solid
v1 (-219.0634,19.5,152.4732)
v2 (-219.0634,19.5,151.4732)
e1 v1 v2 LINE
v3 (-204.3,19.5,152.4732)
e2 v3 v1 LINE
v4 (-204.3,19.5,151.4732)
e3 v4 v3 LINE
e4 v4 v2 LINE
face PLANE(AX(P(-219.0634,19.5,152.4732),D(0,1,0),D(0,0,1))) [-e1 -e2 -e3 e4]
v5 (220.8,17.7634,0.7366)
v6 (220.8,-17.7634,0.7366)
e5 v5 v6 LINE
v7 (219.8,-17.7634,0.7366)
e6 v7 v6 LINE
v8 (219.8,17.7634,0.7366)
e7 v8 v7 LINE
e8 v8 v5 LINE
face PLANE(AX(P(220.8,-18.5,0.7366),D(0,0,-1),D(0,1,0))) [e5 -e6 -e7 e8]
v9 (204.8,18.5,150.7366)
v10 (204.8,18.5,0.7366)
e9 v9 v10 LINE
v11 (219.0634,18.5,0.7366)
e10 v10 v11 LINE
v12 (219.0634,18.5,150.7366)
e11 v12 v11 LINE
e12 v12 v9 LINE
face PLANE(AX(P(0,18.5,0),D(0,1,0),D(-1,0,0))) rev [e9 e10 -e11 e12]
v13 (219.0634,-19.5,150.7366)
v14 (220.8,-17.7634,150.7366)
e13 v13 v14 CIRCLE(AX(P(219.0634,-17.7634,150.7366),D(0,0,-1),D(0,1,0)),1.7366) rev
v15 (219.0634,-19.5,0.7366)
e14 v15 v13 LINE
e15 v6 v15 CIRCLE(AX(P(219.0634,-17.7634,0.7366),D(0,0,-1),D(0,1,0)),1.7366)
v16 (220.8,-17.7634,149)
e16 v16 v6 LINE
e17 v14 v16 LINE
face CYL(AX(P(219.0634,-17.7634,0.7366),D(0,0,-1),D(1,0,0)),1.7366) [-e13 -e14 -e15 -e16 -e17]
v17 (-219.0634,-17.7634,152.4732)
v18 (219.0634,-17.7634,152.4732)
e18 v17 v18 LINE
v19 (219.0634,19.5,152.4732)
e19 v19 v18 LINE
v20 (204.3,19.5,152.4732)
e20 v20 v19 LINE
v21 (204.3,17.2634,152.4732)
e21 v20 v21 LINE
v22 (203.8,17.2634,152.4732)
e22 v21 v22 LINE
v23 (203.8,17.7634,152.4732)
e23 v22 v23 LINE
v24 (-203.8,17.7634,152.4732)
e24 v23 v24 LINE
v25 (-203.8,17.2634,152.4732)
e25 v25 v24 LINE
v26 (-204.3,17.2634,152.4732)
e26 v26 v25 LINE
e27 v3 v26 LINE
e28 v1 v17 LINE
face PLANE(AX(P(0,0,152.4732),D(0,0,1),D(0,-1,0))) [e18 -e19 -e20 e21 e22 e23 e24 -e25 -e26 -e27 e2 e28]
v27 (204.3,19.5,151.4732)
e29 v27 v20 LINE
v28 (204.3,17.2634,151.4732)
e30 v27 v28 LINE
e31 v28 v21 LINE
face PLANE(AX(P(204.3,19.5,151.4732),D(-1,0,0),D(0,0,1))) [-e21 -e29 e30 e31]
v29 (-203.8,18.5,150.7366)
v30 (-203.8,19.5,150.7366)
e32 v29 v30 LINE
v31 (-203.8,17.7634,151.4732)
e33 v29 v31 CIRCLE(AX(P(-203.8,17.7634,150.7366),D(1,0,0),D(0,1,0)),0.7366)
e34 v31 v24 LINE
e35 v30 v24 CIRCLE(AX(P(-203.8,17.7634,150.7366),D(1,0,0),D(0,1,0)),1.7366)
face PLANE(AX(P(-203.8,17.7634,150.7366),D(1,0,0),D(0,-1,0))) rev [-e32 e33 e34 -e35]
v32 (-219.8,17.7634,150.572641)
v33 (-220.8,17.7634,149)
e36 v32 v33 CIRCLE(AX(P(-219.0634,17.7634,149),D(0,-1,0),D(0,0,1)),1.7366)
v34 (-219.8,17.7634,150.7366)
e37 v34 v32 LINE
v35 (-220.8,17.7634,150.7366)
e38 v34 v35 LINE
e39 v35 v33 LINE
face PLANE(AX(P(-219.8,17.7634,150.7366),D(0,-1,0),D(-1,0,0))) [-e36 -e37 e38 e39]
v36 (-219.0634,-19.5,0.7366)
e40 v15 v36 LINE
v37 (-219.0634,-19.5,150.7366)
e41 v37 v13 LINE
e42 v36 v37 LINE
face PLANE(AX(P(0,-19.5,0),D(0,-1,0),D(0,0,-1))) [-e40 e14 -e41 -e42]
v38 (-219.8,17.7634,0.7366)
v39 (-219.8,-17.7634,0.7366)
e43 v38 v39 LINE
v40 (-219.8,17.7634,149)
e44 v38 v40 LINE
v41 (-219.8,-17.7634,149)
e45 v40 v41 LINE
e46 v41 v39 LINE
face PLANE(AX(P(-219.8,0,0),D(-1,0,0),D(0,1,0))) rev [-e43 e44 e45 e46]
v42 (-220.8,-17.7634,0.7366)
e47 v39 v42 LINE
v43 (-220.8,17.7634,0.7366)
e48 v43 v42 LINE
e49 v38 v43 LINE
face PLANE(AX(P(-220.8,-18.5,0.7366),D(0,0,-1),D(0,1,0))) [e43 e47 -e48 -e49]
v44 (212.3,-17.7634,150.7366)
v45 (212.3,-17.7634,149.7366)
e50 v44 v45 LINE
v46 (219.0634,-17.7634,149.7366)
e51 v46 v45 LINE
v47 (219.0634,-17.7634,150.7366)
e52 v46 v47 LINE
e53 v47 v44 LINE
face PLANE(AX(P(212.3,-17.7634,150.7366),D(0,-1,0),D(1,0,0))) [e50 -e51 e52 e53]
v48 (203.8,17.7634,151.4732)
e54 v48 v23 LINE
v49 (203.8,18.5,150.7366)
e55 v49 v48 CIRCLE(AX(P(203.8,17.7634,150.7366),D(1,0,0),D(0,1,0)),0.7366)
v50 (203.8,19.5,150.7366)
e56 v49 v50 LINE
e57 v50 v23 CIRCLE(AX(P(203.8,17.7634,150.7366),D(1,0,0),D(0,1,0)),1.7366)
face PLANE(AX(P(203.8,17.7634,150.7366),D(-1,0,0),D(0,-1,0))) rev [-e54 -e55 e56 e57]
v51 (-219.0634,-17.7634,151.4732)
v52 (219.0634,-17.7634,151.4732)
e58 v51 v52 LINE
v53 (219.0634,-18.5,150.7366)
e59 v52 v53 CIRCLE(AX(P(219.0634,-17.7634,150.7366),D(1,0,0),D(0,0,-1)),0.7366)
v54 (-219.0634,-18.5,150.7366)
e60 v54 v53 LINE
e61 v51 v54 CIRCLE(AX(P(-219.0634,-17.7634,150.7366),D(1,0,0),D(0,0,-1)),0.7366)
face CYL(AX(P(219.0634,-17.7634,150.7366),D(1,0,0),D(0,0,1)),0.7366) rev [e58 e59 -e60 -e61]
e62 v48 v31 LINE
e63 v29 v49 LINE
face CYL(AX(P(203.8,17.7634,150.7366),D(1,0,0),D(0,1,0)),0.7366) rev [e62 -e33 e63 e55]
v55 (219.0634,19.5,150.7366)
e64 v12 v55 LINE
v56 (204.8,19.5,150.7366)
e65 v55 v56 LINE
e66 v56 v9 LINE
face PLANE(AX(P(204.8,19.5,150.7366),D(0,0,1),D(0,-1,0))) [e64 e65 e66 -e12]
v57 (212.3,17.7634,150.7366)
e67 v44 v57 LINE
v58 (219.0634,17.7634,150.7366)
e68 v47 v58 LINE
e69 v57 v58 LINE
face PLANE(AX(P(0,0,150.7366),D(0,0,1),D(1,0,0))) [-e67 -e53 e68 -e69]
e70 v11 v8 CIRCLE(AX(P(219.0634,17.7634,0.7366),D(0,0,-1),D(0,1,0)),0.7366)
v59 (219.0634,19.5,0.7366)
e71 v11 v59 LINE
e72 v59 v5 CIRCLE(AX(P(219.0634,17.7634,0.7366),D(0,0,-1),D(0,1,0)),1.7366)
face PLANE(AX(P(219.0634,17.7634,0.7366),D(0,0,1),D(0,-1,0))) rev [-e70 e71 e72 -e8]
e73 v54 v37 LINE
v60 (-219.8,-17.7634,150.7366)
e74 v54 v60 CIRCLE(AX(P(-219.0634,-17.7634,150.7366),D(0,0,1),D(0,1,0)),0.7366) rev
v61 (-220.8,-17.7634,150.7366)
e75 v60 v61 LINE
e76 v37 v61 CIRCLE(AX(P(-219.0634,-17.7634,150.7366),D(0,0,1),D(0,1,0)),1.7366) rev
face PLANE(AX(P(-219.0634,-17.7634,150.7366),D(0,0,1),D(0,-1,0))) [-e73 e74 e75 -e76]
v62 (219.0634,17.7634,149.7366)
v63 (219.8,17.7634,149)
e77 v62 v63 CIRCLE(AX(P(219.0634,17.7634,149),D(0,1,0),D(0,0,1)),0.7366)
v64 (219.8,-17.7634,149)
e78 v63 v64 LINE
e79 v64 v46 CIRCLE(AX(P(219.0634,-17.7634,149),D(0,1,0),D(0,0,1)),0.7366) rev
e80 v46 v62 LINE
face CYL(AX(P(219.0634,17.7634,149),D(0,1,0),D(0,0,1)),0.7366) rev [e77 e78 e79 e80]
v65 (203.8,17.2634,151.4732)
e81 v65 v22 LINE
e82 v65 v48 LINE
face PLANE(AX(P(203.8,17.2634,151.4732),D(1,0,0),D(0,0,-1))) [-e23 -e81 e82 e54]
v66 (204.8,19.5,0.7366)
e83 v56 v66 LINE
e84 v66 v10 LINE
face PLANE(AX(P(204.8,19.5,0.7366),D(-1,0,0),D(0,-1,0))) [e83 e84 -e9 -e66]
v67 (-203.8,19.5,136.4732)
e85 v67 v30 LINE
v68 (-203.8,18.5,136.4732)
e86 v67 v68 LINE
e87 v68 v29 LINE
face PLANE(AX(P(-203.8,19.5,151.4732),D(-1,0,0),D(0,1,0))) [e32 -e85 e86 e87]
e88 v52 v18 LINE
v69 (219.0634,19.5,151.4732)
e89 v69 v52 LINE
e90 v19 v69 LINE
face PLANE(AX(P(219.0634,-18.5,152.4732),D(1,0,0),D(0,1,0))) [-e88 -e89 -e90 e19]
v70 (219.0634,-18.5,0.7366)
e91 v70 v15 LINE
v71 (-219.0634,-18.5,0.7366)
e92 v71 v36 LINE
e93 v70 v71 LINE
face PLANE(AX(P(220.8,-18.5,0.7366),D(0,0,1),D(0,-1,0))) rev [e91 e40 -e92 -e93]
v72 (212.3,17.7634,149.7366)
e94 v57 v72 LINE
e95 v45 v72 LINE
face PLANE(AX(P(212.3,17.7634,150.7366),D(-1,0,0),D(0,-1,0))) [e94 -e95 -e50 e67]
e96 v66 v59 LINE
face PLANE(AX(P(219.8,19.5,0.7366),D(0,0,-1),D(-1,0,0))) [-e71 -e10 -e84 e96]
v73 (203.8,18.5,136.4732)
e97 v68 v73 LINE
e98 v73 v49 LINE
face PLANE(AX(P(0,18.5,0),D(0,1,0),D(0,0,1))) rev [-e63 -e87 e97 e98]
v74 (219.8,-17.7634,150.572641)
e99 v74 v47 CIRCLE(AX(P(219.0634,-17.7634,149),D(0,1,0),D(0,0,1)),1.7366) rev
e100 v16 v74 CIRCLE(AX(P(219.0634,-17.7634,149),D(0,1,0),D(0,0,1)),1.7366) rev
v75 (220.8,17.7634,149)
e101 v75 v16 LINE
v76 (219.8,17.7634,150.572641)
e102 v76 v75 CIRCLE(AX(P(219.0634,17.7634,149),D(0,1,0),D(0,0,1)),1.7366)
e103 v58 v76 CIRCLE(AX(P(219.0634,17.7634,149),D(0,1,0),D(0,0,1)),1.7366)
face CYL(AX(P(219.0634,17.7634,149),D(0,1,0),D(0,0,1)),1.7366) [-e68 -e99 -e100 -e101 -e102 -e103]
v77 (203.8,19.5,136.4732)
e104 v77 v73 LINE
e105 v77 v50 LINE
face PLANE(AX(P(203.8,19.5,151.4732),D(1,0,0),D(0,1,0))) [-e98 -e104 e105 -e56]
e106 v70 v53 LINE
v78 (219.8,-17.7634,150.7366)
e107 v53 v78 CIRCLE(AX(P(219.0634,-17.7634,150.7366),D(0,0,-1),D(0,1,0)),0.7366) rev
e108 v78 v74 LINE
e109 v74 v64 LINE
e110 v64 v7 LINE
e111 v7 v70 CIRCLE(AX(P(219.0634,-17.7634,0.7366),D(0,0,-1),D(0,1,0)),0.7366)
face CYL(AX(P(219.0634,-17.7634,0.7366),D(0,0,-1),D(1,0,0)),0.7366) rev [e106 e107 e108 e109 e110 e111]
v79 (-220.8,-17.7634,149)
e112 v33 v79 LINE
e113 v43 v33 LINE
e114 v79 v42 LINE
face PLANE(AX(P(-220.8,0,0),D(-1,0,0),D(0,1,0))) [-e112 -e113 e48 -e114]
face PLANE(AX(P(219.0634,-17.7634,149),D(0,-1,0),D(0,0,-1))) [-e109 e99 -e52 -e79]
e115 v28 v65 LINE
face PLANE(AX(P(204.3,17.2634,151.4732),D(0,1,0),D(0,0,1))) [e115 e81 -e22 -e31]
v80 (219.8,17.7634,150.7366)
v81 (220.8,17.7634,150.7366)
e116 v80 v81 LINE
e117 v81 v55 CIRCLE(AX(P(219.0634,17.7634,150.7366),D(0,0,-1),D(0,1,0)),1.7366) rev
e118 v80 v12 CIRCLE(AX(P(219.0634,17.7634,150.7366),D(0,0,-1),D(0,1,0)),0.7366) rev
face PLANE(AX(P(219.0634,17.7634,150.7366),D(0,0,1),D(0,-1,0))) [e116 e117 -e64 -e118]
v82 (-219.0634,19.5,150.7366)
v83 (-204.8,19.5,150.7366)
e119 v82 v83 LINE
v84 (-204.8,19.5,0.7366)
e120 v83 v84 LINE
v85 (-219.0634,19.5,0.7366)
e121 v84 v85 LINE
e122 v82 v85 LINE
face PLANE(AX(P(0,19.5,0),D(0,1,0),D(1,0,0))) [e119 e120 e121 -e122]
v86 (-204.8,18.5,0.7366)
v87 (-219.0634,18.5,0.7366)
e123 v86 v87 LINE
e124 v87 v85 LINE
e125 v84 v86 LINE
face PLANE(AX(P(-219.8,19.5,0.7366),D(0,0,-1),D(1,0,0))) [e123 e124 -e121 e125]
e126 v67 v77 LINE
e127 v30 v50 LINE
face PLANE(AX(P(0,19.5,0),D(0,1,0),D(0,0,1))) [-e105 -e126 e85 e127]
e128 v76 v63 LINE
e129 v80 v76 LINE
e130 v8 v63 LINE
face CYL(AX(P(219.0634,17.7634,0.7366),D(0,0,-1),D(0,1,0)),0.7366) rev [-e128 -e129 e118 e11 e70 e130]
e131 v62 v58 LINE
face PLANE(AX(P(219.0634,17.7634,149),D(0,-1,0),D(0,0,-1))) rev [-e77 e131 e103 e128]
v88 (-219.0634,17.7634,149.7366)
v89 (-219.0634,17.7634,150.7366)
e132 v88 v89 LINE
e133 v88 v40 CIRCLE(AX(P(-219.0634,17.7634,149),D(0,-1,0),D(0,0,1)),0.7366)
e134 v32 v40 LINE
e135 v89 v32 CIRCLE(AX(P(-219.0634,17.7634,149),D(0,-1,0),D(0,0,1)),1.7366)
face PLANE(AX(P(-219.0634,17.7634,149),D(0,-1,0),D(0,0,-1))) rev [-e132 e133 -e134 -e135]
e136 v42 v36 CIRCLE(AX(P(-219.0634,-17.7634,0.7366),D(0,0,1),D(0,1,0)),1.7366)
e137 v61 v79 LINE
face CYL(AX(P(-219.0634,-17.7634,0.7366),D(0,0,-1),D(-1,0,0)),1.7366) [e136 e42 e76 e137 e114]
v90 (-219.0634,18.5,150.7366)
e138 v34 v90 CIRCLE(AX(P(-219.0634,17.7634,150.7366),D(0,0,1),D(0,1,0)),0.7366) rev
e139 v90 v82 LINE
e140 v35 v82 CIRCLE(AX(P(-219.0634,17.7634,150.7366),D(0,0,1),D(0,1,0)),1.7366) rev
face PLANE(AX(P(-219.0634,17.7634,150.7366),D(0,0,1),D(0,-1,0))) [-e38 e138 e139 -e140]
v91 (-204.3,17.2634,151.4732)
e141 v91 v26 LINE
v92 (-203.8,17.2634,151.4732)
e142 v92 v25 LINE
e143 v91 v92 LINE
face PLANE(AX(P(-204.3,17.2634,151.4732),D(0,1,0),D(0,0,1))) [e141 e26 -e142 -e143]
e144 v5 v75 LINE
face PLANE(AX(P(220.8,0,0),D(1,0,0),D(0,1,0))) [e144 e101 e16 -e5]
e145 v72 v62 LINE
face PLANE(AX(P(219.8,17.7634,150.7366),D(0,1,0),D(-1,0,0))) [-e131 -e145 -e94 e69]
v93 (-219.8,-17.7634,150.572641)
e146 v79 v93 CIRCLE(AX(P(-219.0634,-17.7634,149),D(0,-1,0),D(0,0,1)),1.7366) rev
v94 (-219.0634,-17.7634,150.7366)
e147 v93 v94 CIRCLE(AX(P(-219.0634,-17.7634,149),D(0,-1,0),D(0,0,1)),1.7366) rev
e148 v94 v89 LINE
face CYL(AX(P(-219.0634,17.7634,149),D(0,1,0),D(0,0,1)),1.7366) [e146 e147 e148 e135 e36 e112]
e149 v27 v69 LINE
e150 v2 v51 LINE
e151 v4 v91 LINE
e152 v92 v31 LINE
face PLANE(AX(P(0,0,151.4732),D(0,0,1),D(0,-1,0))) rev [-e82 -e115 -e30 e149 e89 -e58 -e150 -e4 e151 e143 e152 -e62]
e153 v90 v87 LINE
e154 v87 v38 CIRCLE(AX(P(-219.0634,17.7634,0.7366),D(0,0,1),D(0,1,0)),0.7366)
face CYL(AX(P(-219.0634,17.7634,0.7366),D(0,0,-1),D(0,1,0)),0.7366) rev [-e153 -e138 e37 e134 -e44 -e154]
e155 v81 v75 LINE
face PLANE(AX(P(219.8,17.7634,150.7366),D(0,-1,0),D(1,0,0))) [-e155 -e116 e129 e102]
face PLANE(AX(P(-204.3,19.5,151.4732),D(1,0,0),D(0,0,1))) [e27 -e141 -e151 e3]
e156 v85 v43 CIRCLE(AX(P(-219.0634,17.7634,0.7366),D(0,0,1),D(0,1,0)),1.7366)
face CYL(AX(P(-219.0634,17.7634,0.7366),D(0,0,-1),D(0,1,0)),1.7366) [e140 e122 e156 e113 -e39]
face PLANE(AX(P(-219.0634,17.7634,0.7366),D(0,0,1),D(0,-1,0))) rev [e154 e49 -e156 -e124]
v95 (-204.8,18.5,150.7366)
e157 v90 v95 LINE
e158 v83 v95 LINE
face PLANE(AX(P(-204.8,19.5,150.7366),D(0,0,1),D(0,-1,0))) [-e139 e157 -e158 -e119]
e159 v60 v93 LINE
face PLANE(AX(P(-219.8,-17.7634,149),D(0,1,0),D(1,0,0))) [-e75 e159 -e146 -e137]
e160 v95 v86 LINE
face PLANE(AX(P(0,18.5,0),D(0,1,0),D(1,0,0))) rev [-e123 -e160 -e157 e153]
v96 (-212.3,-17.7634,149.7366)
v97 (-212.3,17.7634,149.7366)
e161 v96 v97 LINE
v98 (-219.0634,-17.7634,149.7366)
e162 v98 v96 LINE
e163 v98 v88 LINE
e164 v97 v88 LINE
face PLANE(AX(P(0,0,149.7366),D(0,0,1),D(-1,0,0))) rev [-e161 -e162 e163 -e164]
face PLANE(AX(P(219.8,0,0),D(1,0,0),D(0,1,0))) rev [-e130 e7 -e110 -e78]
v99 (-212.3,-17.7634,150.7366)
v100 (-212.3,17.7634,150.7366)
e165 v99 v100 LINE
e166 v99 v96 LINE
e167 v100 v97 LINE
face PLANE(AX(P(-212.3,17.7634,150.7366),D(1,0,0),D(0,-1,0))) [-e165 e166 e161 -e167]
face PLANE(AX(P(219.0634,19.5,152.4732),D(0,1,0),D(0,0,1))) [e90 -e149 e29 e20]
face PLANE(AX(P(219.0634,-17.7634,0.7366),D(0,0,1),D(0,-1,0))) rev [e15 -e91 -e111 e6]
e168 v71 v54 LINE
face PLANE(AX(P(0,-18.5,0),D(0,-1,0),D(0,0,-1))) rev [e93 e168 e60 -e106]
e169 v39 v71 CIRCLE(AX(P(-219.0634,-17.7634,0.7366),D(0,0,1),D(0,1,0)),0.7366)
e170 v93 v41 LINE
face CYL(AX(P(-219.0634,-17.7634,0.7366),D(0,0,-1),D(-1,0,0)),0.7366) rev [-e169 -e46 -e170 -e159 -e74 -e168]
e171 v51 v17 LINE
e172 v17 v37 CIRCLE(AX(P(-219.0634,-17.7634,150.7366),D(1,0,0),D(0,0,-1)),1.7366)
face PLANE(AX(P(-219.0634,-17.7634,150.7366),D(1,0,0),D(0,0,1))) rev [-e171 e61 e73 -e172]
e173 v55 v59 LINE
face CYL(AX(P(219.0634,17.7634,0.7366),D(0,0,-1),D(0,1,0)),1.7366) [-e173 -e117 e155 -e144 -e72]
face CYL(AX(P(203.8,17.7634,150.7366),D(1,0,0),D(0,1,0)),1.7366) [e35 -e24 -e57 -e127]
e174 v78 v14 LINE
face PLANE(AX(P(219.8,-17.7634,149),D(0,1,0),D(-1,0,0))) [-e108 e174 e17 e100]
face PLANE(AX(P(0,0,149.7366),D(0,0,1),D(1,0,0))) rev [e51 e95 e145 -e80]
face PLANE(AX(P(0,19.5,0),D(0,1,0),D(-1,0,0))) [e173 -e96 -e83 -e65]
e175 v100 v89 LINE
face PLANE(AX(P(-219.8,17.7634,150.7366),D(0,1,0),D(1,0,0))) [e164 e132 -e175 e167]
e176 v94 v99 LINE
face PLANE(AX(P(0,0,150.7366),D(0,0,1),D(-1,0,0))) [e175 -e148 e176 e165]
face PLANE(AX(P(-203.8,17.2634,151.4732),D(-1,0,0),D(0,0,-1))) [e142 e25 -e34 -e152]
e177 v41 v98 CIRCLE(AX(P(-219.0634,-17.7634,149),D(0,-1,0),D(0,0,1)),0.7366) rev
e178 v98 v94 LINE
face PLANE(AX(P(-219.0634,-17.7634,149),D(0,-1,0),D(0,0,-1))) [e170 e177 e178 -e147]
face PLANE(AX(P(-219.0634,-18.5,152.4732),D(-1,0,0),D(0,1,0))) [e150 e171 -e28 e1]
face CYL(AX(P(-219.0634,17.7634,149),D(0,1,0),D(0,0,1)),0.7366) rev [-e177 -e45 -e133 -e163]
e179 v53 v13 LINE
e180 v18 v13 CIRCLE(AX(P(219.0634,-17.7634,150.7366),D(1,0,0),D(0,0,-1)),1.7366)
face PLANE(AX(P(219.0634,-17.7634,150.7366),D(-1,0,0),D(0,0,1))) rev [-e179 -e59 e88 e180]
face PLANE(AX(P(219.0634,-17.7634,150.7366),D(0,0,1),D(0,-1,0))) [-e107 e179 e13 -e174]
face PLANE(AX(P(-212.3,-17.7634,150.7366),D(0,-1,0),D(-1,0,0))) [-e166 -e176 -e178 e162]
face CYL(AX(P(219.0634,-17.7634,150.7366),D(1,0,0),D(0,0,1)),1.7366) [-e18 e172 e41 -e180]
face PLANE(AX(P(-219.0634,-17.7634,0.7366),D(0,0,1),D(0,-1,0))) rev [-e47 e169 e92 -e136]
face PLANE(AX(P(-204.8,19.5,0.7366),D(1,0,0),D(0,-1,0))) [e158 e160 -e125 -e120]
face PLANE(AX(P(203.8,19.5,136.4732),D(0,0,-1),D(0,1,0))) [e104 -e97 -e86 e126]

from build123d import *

# Parameters (mm, degrees)
SKETCH71_W                              = 220.8
SKETCH71_H                              = 150
BASE_FLANGE_DEPTH                       = 1
EDGE_FLANGE_SIDE_STRIP_W                = 5.4732
EDGE_FLANGE_SIDE_STRIP_H                = 1
EDGE_FLANGE_SIDE_STRIP_CUT_DEPTH        = 150
EDGE_FLANGE_SIDE_DEPTH                  = 150
EDGE_FLANGE_SIDE_TOP_STRIP_W            = 5.4732
EDGE_FLANGE_SIDE_TOP_STRIP_H            = 1
EDGE_FLANGE_SIDE_TOP_STRIP_CUT_DEPTH    = 150
EDGE_FLANGE_SIDE_TOP_DEPTH              = 150
EDGE_FLANGE_BOTTOM_DEPTH                = 219.0634
EDGE_FLANGE_BOTTOM_TOP_STRIP_W          = 5.4732
EDGE_FLANGE_BOTTOM_TOP_STRIP_H          = 1
EDGE_FLANGE_BOTTOM_TOP_STRIP_CUT_DEPTH  = 203.8
EDGE_FLANGE_BOTTOM_TOP_RELIEF_W         = 5.9732
EDGE_FLANGE_BOTTOM_TOP_RELIEF_H         = 0.5
EDGE_FLANGE_BOTTOM_TOP_RELIEF_CUT_DEPTH = 1
EDGE_FLANGE_BOTTOM_TOP_DEPTH            = 203.8
EDGE_FLANGE_SIDE_BOTTOM_STRIP_W         = 5.4732
EDGE_FLANGE_SIDE_BOTTOM_STRIP_H         = 1
EDGE_FLANGE_SIDE_BOTTOM_STRIP_CUT_DEPTH = 35.5268
EDGE_FLANGE_SIDE_BOTTOM_DEPTH           = 35.5268


# Sheet-metal steps are written as plain solids
with BuildPart() as part:
    # Sketch71 → Base-Flange (new body)
    with BuildSketch(Plane(origin=(0, -19.5, 0), x_dir=(1, 0, 0), z_dir=(0, 1, 0))):
        with Locations((110.4, -75.7366)):
            Rectangle(SKETCH71_W, SKETCH71_H)
    extrude(amount=BASE_FLANGE_DEPTH)

    # Edge-Flange-Side strip (across the edge) → Edge-Flange-Side strip cut (cut)
    with BuildSketch(Plane(origin=(220.8, -18.5, 150.7366), x_dir=(-1, 0, 0), z_dir=(0, 0, -1))):
        with Locations((-1, -0.5)):
            Rectangle(EDGE_FLANGE_SIDE_STRIP_W, EDGE_FLANGE_SIDE_STRIP_H)
    extrude(amount=EDGE_FLANGE_SIDE_STRIP_CUT_DEPTH, mode=Mode.SUBTRACT)

    # Edge-Flange-Side section (across the edge) → Edge-Flange-Side (add)
    with BuildSketch(Plane(origin=(220.8, -18.5, 150.7366), x_dir=(-1, 0, 0), z_dir=(0, 0, -1))):
        with BuildLine():
            Line((0, 0.7366), (0, 38))
            Line((0, 38), (1, 38))
            Line((1, 38), (1, 0.7366))
            ThreePointArc((1, 0.7366), (1.215745145, 0.215745145), (1.7366, 0))
            Line((1.7366, 0), (1.7366, -1))
            ThreePointArc((1.7366, -1), (0.508638364, -0.491361636), (0, 0.7366))
        make_face()
    extrude(amount=EDGE_FLANGE_SIDE_DEPTH)

    # Edge-Flange-Side-Top strip (across the edge) → Edge-Flange-Side-Top strip cut (cut)
    with BuildSketch(Plane(origin=(219.8, 19.5, 150.7366), x_dir=(0, -1, 0), z_dir=(0, 0, -1))):
        with Locations((-1, -0.5)):
            Rectangle(EDGE_FLANGE_SIDE_TOP_STRIP_W, EDGE_FLANGE_SIDE_TOP_STRIP_H)
    extrude(amount=EDGE_FLANGE_SIDE_TOP_STRIP_CUT_DEPTH, mode=Mode.SUBTRACT)

    # Edge-Flange-Side-Top section (across the edge) → Edge-Flange-Side-Top (add)
    with BuildSketch(Plane(origin=(219.8, 19.5, 150.7366), x_dir=(0, -1, 0), z_dir=(0, 0, -1))):
        with BuildLine():
            Line((0, 0.7366), (0, 15))
            Line((0, 15), (1, 15))
            Line((1, 15), (1, 0.7366))
            ThreePointArc((1, 0.7366), (1.215745145, 0.215745145), (1.7366, 0))
            Line((1.7366, 0), (1.7366, -1))
            ThreePointArc((1.7366, -1), (0.508638364, -0.491361636), (0, 0.7366))
        make_face()
    extrude(amount=EDGE_FLANGE_SIDE_TOP_DEPTH)

    # Edge-Flange-Bottom section (across the edge) → Edge-Flange-Bottom (add)
    with BuildSketch(Plane(origin=(0, -18.5, 151.4732), x_dir=(0, 0, -1), z_dir=(1, 0, 0))):
        with BuildLine():
            Line((-1, 0.7366), (-1, 38))
            Line((-1, 38), (0, 38))
            Line((0, 38), (0, 0.7366))
            ThreePointArc((0, 0.7366), (0.215745145, 0.215745145), (0.7366, 0))
            Line((0.7366, 0), (0.7366, -1))
            ThreePointArc((0.7366, -1), (-0.491361636, -0.491361636), (-1, 0.7366))
        make_face()
    extrude(amount=EDGE_FLANGE_BOTTOM_DEPTH)

    # Edge-Flange-Bottom-Top strip (across the edge) → Edge-Flange-Bottom-Top strip cut (cut)
    with BuildSketch(Plane(origin=(0, 19.5, 151.4732), x_dir=(0, -1, 0), z_dir=(1, 0, 0))):
        with Locations((-1, -0.5)):
            Rectangle(EDGE_FLANGE_BOTTOM_TOP_STRIP_W, EDGE_FLANGE_BOTTOM_TOP_STRIP_H)
    extrude(amount=EDGE_FLANGE_BOTTOM_TOP_STRIP_CUT_DEPTH, mode=Mode.SUBTRACT)

    # Edge-Flange-Bottom-Top relief (on the sheet) → Edge-Flange-Bottom-Top relief cut (cut)
    with BuildSketch(Plane(origin=(0, 17.7634, 151.4732), x_dir=(0, -1, 0), z_dir=(0, 0, -1))):
        with Locations((-2.4866, -204.05)):
            Rectangle(EDGE_FLANGE_BOTTOM_TOP_RELIEF_W, EDGE_FLANGE_BOTTOM_TOP_RELIEF_H)
    extrude(amount=-EDGE_FLANGE_BOTTOM_TOP_RELIEF_CUT_DEPTH, mode=Mode.SUBTRACT)

    # Edge-Flange-Bottom-Top section (across the edge) → Edge-Flange-Bottom-Top (add)
    with BuildSketch(Plane(origin=(0, 19.5, 151.4732), x_dir=(0, -1, 0), z_dir=(1, 0, 0))):
        with BuildLine():
            Line((0, 0.7366), (0, 15))
            Line((0, 15), (1, 15))
            Line((1, 15), (1, 0.7366))
            ThreePointArc((1, 0.7366), (1.215745145, 0.215745145), (1.7366, 0))
            Line((1.7366, 0), (1.7366, -1))
            ThreePointArc((1.7366, -1), (0.508638364, -0.491361636), (0, 0.7366))
        make_face()
    extrude(amount=EDGE_FLANGE_BOTTOM_TOP_DEPTH)

    # Edge-Flange-Side-Bottom strip (across the edge) → Edge-Flange-Side-Bottom strip cut (cut)
    with BuildSketch(Plane(origin=(219.8, -17.7634, 150.7366), x_dir=(0, 0, -1), z_dir=(0, 1, 0))):
        with Locations((-1, -0.5)):
            Rectangle(EDGE_FLANGE_SIDE_BOTTOM_STRIP_W, EDGE_FLANGE_SIDE_BOTTOM_STRIP_H)
    extrude(amount=EDGE_FLANGE_SIDE_BOTTOM_STRIP_CUT_DEPTH, mode=Mode.SUBTRACT)

    # Edge-Flange-Side-Bottom section (across the edge) → Edge-Flange-Side-Bottom (add)
    with BuildSketch(Plane(origin=(219.8, -17.7634, 150.7366), x_dir=(0, 0, -1), z_dir=(0, 1, 0))):
        with BuildLine():
            Line((0, 0.7366), (0, 7.5))
            Line((0, 7.5), (1, 7.5))
            Line((1, 7.5), (1, 0.7366))
            ThreePointArc((1, 0.7366), (1.215745145, 0.215745145), (1.7366, 0))
            Line((1.7366, 0), (1.7366, -1))
            ThreePointArc((1.7366, -1), (0.508638364, -0.491361636), (0, 0.7366))
        make_face()
    extrude(amount=EDGE_FLANGE_SIDE_BOTTOM_DEPTH)

    # Mirror-Vertical: part across plane


with BuildPart() as part_1:
    add(part.part)
    add(part.part.mirror(Plane(origin=(0, -18.5, 0.7366), x_dir=(0, 0, 1), z_dir=(1, 0, 0))))


solid = part_1.part
